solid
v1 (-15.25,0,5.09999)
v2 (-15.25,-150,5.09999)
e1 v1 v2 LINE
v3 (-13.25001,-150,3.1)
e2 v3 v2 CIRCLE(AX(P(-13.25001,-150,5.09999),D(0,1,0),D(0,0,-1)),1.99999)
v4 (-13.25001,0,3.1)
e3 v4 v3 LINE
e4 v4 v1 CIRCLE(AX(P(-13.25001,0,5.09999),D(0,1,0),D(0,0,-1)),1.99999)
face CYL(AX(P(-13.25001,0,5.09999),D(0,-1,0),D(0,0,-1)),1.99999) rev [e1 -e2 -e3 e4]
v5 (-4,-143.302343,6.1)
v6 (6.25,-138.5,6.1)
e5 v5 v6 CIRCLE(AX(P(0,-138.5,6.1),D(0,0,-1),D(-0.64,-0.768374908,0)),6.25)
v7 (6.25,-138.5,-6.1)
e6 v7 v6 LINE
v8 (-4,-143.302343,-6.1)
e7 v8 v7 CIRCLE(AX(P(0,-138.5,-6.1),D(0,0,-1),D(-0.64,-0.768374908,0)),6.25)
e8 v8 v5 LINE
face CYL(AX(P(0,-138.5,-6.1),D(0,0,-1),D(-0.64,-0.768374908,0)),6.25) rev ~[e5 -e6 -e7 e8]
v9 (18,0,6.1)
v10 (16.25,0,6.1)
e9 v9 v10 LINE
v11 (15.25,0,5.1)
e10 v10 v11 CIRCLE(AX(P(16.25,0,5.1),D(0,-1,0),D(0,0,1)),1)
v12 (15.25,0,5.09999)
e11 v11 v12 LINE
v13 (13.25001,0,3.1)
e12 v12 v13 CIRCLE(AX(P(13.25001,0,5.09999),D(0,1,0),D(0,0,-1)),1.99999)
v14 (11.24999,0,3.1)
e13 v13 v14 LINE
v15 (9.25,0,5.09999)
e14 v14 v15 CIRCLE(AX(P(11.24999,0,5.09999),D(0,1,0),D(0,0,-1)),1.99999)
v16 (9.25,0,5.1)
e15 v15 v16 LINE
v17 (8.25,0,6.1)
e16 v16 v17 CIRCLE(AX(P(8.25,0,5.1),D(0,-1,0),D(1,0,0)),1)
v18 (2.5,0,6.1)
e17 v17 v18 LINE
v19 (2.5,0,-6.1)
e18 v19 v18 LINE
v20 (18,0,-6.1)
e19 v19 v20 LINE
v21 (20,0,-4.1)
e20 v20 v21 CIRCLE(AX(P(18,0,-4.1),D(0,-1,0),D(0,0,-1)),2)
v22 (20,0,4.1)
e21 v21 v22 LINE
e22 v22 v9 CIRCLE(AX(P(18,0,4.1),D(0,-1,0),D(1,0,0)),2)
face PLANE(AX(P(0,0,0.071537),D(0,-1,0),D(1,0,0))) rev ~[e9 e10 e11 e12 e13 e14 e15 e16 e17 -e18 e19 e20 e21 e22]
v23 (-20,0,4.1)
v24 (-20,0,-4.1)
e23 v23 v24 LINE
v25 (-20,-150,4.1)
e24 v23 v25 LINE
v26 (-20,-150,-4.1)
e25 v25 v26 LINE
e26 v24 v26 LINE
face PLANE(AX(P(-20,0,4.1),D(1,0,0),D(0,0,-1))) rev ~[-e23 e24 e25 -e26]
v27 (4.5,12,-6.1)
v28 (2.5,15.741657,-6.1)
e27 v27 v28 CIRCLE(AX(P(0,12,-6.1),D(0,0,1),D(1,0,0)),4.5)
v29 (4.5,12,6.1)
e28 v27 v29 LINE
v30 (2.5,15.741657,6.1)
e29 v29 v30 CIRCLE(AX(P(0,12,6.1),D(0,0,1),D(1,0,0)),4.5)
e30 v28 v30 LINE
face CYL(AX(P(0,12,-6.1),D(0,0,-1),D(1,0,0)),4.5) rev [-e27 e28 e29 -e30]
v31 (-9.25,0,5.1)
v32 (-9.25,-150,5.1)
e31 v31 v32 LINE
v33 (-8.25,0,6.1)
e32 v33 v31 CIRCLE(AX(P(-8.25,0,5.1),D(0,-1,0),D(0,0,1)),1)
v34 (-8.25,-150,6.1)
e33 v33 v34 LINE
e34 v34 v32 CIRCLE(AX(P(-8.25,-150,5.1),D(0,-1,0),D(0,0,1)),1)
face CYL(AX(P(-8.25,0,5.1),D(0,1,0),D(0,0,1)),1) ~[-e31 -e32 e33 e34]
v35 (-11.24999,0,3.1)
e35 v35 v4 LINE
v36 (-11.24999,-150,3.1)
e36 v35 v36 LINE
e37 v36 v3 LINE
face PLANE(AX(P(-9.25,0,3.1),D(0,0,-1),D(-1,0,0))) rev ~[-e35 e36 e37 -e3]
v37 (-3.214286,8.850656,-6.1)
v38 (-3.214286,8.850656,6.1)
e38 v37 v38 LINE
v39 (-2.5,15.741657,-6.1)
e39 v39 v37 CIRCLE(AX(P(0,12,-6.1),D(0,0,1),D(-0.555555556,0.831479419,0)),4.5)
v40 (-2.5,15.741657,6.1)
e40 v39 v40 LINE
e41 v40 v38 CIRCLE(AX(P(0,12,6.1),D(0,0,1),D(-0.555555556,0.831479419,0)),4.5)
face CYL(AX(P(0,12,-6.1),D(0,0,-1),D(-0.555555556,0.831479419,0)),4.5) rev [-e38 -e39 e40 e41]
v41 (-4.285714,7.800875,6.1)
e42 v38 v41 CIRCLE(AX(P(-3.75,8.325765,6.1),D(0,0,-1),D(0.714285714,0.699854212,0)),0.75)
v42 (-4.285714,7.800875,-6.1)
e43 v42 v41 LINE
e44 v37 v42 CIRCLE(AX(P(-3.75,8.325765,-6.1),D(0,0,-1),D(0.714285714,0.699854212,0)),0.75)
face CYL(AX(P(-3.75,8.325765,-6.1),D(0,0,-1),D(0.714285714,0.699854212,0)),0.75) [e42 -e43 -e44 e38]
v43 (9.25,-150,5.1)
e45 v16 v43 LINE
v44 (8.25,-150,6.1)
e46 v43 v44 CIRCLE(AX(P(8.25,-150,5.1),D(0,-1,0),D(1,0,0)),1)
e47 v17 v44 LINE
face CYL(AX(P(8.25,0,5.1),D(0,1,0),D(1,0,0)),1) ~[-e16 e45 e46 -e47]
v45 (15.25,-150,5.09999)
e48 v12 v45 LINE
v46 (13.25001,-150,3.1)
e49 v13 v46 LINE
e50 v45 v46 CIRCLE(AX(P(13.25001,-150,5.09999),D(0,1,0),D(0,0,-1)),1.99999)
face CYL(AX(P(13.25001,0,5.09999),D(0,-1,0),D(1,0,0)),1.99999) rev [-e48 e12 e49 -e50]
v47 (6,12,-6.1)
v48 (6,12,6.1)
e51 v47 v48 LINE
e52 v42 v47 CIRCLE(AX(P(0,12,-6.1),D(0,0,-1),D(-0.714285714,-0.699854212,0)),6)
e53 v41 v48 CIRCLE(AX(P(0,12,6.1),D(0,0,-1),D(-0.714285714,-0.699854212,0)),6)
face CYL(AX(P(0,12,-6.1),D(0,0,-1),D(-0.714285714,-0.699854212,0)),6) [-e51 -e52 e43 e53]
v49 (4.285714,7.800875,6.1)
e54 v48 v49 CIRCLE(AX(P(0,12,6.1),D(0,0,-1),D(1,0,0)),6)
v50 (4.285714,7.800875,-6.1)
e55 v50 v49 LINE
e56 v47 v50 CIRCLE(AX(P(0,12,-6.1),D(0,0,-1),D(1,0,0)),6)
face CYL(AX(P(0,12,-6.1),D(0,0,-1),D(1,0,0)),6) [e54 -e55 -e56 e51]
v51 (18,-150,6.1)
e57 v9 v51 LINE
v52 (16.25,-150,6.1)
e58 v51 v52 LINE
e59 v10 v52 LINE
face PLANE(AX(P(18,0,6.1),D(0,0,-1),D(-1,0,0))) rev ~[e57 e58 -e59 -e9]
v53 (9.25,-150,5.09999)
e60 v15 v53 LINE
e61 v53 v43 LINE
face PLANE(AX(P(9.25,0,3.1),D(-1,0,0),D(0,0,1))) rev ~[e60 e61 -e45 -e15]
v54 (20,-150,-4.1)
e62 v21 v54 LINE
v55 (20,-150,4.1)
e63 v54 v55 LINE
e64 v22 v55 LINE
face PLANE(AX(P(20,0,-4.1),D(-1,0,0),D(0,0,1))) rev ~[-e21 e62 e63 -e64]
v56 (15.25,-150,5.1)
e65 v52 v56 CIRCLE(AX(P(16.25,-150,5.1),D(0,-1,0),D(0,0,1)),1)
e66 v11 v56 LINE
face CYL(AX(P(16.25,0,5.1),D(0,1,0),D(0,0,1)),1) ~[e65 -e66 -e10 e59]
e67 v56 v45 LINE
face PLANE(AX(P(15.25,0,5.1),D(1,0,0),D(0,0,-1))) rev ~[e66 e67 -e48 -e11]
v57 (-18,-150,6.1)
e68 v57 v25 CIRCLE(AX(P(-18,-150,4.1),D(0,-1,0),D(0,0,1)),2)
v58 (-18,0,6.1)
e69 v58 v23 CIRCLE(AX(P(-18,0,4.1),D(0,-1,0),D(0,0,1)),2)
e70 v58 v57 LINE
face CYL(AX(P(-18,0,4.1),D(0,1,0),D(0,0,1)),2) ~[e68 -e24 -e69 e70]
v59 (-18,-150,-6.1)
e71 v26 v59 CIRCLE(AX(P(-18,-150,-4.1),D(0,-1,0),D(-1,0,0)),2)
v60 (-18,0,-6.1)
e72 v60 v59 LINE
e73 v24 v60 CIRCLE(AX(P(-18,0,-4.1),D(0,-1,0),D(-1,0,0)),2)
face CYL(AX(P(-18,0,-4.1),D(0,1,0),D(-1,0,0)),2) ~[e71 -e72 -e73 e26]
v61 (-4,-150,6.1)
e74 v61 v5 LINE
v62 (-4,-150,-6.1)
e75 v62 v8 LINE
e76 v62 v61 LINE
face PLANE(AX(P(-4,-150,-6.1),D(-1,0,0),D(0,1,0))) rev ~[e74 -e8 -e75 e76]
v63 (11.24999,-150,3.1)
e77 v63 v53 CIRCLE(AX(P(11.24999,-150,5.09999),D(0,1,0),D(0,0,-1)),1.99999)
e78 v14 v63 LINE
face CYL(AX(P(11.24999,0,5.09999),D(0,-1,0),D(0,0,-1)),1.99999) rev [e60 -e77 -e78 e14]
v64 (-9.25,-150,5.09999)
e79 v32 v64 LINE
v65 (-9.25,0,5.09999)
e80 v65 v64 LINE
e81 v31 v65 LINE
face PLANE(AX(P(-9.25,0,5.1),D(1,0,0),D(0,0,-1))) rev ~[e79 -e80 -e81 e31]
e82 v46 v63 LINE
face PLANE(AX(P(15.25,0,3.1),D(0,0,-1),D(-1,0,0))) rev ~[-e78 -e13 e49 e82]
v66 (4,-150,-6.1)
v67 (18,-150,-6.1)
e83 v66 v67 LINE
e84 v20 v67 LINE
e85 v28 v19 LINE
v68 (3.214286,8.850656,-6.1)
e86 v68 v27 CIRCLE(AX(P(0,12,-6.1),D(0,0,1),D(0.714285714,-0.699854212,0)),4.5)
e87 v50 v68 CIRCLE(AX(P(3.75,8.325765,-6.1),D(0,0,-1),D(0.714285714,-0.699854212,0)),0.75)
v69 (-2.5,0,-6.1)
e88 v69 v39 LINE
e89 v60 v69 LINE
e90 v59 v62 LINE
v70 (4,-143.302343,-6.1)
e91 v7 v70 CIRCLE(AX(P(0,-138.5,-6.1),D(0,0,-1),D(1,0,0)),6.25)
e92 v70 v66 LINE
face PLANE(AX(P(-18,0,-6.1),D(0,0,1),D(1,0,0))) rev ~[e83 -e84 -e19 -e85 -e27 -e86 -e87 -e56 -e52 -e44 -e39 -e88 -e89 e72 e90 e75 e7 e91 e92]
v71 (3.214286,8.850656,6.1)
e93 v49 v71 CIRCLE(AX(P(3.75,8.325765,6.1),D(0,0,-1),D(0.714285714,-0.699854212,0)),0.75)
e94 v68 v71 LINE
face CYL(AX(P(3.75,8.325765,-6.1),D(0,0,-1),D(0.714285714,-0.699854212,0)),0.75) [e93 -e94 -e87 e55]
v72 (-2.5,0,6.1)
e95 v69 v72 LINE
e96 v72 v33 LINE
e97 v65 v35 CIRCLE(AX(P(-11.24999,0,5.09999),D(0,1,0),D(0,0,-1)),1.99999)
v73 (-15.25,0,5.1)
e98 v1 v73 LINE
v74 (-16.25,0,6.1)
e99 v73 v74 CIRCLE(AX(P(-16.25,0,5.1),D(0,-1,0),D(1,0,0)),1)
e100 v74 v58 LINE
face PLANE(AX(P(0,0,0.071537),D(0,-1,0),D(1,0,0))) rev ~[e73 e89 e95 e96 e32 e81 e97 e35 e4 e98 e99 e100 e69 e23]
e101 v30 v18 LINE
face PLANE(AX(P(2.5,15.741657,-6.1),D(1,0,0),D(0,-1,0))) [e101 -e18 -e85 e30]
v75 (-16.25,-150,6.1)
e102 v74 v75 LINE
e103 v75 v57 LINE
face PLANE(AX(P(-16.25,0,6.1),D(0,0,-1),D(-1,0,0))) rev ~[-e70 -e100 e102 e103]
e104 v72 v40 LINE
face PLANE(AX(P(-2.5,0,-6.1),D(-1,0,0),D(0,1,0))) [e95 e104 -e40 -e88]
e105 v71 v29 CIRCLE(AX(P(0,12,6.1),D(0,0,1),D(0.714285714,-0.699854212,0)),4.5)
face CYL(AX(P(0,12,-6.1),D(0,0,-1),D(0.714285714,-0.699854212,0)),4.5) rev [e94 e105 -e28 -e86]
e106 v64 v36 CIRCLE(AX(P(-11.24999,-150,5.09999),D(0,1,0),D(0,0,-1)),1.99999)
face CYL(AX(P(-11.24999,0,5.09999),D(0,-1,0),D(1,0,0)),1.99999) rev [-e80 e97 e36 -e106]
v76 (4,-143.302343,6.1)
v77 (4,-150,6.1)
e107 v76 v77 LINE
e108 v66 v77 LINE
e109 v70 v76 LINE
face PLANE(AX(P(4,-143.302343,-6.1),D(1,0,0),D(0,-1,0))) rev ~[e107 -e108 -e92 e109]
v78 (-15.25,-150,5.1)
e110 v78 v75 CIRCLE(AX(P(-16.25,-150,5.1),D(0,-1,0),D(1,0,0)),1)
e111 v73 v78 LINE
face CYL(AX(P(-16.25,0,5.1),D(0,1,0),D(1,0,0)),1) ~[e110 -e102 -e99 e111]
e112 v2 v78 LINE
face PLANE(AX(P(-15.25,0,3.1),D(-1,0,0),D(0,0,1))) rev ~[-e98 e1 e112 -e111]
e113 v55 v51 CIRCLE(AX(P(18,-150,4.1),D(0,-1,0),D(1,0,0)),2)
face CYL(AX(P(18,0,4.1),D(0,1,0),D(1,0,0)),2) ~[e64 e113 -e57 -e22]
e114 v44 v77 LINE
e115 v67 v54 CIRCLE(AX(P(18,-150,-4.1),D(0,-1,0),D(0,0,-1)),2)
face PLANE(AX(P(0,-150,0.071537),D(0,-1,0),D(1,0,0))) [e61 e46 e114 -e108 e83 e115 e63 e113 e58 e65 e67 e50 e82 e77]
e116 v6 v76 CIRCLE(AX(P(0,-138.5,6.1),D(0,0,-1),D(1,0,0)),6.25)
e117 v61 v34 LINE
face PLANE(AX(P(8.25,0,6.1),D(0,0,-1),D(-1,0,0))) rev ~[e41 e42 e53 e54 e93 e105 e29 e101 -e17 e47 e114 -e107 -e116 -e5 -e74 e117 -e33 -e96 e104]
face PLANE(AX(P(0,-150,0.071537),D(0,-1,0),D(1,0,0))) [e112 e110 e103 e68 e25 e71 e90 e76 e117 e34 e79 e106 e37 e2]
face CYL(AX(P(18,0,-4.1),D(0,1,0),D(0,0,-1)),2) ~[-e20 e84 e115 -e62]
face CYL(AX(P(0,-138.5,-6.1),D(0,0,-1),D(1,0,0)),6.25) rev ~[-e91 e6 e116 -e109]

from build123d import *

# Parameters (mm, degrees)
F1_DEPTH = 150
F2_R     = 1.99999
F4_DEPTH = 12.2
F5_DEPTH = 25


# Not quite as in the source:
# - a fillet or chamfer is up to 0.001 mm smaller than in the source, because OpenCascade refuses the exact size


with BuildPart() as f1:
    # F0 (on Front) → F1 (new body)
    with BuildSketch(Plane.XZ):
        with BuildLine():
            ThreePointArc((20, 4.1), (19.4142135624, 5.5142135624), (18, 6.1))
            Line((18, 6.1), (16.25, 6.1))
            ThreePointArc((16.25, 6.1), (15.5428932188, 5.8071067812), (15.25, 5.1))
            Line((15.25, 5.1), (15.25, 3.1))
            Line((15.25, 3.1), (9.25, 3.1))
            Line((9.25, 3.1), (9.25, 5.1))
            ThreePointArc((9.25, 5.1), (8.9571067812, 5.8071067812), (8.25, 6.1))
            Line((8.25, 6.1), (-8.25, 6.1))
            ThreePointArc((-8.25, 6.1), (-8.9571067812, 5.8071067812), (-9.25, 5.1))
            Line((-9.25, 5.1), (-9.25, 3.1))
            Line((-9.25, 3.1), (-15.25, 3.1))
            Line((-15.25, 3.1), (-15.25, 5.1))
            ThreePointArc((-15.25, 5.1), (-15.5428932188, 5.8071067812), (-16.25, 6.1))
            Line((-16.25, 6.1), (-18, 6.1))
            ThreePointArc((-18, 6.1), (-19.4142135624, 5.5142135624), (-20, 4.1))
            Line((-20, 4.1), (-20, -4.1))
            ThreePointArc((-20, -4.1), (-19.4142135624, -5.5142135624), (-18, -6.1))
            Line((-18, -6.1), (18, -6.1))
            ThreePointArc((18, -6.1), (19.4142135624, -5.5142135624), (20, -4.1))
            Line((20, -4.1), (20, 4.1))
        make_face()
    extrude(amount=F1_DEPTH)

    # F2 (radius 2 in the source; OpenCascade refuses exactly that, so slightly less here)
    f2_edges = [f1.edges().sort_by_distance(p)[0] for p in [
        (15.25, -75, 3.1),
        (9.25, -75, 3.1),
        (-9.25, -75, 3.1),
        (-15.25, -75, 3.1),
    ]]
    fillet(f2_edges, radius=F2_R)

    # F3 (on face) → F4 (join)
    with BuildSketch(Plane(origin=(0, 0, -6.1), x_dir=(1, 0, 0), z_dir=(0, 0, -1))):
        with BuildLine():
            Line((0, 0), (-2.5, 0))
            Line((-2.5, 0), (-2.5, -6.5456439427))
            ThreePointArc((-2.5, -6.5456439427), (-1.2794263668, -6.1379979383), (0, -6))
            Line((0, -6), (0, 0))
        make_face()
        with BuildLine():
            Line((2.5, -6.5456439427), (2.5, 0))
            Line((2.5, 0), (0, 0))
            Line((0, 0), (0, -6))
            ThreePointArc((0, -6), (1.2794263668, -6.1379979383), (2.5, -6.5456439427))
        make_face()
        with BuildLine():
            Line((2.5, -8.2583426132), (2.5, -6.5456439427))
            ThreePointArc((2.5, -6.5456439427), (1.2794263668, -6.1379979383), (0, -6))
            Line((0, -6), (0, -7.5))
            ThreePointArc((0, -7.5), (1.3062430401, -7.6937569599), (2.5, -8.2583426132))
        make_face()
        with BuildLine():
            ThreePointArc((0, -6), (-1.2794263668, -6.1379979383), (-2.5, -6.5456439427))
            Line((-2.5, -6.5456439427), (-2.5, -8.2583426132))
            ThreePointArc((-2.5, -8.2583426132), (-1.3062430401, -7.6937569599), (0, -7.5))
            Line((0, -7.5), (0, -6))
        make_face()
        with BuildLine():
            Line((2.5, -15.7416573868), (2.5, -8.2583426132))
            ThreePointArc((2.5, -8.2583426132), (1.3062430401, -7.6937569599), (0, -7.5))
            ThreePointArc((0, -7.5), (-1.3062430401, -7.6937569599), (-2.5, -8.2583426132))
            Line((-2.5, -8.2583426132), (-2.5, -15.7416573868))
            ThreePointArc((-2.5, -15.7416573868), (0, -16.5), (2.5, -15.7416573868))
        make_face()
        with BuildLine():
            ThreePointArc((6, -12), (5.5549205986, -9.7322131619), (4.2857142857, -7.8008747267))
            ThreePointArc((4.2857142857, -7.8008747267), (3.2251093408, -7.7900511001), (3.2142857143, -8.850656045))
            ThreePointArc((3.2142857143, -8.850656045), (4.166190449, -10.2991598715), (4.5, -12))
            ThreePointArc((4.5, -12), (3.9686269666, -14.1213203436), (2.5, -15.7416573868))
            ThreePointArc((2.5, -15.7416573868), (0, -16.5), (-2.5, -15.7416573868))
            ThreePointArc((-2.5, -15.7416573868), (-4.4760183399, -12.4639610121), (-3.2142857143, -8.850656045))
            ThreePointArc((-3.2142857143, -8.850656045), (-3.2251093408, -7.7900511001), (-4.2857142857, -7.8008747267))
            ThreePointArc((-4.2857142857, -7.8008747267), (-2.2677868381, -17.5549205986), (6, -12))
        make_face()
    extrude(amount=-F4_DEPTH)

    # F3 (on face) → F5 (cut)
    with BuildSketch(Plane(origin=(0, 0, -6.1), x_dir=(1, 0, 0), z_dir=(0, 0, -1))):
        with BuildLine():
            ThreePointArc((-4, 143.3023431781), (0, 144.75), (4, 143.3023431781))
            Line((4, 143.3023431781), (4, 150))
            Line((4, 150), (-4, 150))
            Line((-4, 150), (-4, 143.3023431781))
        make_face()
        with BuildLine():
            ThreePointArc((-4, 143.3023431781), (-2.6516504294, 132.8403842887), (6.25, 138.5))
            ThreePointArc((6.25, 138.5), (5.6596157113, 141.1516504294), (4, 143.3023431781))
            ThreePointArc((4, 143.3023431781), (0, 144.75), (-4, 143.3023431781))
        make_face()
    extrude(amount=-F5_DEPTH, mode=Mode.SUBTRACT)


solid = f1.part
